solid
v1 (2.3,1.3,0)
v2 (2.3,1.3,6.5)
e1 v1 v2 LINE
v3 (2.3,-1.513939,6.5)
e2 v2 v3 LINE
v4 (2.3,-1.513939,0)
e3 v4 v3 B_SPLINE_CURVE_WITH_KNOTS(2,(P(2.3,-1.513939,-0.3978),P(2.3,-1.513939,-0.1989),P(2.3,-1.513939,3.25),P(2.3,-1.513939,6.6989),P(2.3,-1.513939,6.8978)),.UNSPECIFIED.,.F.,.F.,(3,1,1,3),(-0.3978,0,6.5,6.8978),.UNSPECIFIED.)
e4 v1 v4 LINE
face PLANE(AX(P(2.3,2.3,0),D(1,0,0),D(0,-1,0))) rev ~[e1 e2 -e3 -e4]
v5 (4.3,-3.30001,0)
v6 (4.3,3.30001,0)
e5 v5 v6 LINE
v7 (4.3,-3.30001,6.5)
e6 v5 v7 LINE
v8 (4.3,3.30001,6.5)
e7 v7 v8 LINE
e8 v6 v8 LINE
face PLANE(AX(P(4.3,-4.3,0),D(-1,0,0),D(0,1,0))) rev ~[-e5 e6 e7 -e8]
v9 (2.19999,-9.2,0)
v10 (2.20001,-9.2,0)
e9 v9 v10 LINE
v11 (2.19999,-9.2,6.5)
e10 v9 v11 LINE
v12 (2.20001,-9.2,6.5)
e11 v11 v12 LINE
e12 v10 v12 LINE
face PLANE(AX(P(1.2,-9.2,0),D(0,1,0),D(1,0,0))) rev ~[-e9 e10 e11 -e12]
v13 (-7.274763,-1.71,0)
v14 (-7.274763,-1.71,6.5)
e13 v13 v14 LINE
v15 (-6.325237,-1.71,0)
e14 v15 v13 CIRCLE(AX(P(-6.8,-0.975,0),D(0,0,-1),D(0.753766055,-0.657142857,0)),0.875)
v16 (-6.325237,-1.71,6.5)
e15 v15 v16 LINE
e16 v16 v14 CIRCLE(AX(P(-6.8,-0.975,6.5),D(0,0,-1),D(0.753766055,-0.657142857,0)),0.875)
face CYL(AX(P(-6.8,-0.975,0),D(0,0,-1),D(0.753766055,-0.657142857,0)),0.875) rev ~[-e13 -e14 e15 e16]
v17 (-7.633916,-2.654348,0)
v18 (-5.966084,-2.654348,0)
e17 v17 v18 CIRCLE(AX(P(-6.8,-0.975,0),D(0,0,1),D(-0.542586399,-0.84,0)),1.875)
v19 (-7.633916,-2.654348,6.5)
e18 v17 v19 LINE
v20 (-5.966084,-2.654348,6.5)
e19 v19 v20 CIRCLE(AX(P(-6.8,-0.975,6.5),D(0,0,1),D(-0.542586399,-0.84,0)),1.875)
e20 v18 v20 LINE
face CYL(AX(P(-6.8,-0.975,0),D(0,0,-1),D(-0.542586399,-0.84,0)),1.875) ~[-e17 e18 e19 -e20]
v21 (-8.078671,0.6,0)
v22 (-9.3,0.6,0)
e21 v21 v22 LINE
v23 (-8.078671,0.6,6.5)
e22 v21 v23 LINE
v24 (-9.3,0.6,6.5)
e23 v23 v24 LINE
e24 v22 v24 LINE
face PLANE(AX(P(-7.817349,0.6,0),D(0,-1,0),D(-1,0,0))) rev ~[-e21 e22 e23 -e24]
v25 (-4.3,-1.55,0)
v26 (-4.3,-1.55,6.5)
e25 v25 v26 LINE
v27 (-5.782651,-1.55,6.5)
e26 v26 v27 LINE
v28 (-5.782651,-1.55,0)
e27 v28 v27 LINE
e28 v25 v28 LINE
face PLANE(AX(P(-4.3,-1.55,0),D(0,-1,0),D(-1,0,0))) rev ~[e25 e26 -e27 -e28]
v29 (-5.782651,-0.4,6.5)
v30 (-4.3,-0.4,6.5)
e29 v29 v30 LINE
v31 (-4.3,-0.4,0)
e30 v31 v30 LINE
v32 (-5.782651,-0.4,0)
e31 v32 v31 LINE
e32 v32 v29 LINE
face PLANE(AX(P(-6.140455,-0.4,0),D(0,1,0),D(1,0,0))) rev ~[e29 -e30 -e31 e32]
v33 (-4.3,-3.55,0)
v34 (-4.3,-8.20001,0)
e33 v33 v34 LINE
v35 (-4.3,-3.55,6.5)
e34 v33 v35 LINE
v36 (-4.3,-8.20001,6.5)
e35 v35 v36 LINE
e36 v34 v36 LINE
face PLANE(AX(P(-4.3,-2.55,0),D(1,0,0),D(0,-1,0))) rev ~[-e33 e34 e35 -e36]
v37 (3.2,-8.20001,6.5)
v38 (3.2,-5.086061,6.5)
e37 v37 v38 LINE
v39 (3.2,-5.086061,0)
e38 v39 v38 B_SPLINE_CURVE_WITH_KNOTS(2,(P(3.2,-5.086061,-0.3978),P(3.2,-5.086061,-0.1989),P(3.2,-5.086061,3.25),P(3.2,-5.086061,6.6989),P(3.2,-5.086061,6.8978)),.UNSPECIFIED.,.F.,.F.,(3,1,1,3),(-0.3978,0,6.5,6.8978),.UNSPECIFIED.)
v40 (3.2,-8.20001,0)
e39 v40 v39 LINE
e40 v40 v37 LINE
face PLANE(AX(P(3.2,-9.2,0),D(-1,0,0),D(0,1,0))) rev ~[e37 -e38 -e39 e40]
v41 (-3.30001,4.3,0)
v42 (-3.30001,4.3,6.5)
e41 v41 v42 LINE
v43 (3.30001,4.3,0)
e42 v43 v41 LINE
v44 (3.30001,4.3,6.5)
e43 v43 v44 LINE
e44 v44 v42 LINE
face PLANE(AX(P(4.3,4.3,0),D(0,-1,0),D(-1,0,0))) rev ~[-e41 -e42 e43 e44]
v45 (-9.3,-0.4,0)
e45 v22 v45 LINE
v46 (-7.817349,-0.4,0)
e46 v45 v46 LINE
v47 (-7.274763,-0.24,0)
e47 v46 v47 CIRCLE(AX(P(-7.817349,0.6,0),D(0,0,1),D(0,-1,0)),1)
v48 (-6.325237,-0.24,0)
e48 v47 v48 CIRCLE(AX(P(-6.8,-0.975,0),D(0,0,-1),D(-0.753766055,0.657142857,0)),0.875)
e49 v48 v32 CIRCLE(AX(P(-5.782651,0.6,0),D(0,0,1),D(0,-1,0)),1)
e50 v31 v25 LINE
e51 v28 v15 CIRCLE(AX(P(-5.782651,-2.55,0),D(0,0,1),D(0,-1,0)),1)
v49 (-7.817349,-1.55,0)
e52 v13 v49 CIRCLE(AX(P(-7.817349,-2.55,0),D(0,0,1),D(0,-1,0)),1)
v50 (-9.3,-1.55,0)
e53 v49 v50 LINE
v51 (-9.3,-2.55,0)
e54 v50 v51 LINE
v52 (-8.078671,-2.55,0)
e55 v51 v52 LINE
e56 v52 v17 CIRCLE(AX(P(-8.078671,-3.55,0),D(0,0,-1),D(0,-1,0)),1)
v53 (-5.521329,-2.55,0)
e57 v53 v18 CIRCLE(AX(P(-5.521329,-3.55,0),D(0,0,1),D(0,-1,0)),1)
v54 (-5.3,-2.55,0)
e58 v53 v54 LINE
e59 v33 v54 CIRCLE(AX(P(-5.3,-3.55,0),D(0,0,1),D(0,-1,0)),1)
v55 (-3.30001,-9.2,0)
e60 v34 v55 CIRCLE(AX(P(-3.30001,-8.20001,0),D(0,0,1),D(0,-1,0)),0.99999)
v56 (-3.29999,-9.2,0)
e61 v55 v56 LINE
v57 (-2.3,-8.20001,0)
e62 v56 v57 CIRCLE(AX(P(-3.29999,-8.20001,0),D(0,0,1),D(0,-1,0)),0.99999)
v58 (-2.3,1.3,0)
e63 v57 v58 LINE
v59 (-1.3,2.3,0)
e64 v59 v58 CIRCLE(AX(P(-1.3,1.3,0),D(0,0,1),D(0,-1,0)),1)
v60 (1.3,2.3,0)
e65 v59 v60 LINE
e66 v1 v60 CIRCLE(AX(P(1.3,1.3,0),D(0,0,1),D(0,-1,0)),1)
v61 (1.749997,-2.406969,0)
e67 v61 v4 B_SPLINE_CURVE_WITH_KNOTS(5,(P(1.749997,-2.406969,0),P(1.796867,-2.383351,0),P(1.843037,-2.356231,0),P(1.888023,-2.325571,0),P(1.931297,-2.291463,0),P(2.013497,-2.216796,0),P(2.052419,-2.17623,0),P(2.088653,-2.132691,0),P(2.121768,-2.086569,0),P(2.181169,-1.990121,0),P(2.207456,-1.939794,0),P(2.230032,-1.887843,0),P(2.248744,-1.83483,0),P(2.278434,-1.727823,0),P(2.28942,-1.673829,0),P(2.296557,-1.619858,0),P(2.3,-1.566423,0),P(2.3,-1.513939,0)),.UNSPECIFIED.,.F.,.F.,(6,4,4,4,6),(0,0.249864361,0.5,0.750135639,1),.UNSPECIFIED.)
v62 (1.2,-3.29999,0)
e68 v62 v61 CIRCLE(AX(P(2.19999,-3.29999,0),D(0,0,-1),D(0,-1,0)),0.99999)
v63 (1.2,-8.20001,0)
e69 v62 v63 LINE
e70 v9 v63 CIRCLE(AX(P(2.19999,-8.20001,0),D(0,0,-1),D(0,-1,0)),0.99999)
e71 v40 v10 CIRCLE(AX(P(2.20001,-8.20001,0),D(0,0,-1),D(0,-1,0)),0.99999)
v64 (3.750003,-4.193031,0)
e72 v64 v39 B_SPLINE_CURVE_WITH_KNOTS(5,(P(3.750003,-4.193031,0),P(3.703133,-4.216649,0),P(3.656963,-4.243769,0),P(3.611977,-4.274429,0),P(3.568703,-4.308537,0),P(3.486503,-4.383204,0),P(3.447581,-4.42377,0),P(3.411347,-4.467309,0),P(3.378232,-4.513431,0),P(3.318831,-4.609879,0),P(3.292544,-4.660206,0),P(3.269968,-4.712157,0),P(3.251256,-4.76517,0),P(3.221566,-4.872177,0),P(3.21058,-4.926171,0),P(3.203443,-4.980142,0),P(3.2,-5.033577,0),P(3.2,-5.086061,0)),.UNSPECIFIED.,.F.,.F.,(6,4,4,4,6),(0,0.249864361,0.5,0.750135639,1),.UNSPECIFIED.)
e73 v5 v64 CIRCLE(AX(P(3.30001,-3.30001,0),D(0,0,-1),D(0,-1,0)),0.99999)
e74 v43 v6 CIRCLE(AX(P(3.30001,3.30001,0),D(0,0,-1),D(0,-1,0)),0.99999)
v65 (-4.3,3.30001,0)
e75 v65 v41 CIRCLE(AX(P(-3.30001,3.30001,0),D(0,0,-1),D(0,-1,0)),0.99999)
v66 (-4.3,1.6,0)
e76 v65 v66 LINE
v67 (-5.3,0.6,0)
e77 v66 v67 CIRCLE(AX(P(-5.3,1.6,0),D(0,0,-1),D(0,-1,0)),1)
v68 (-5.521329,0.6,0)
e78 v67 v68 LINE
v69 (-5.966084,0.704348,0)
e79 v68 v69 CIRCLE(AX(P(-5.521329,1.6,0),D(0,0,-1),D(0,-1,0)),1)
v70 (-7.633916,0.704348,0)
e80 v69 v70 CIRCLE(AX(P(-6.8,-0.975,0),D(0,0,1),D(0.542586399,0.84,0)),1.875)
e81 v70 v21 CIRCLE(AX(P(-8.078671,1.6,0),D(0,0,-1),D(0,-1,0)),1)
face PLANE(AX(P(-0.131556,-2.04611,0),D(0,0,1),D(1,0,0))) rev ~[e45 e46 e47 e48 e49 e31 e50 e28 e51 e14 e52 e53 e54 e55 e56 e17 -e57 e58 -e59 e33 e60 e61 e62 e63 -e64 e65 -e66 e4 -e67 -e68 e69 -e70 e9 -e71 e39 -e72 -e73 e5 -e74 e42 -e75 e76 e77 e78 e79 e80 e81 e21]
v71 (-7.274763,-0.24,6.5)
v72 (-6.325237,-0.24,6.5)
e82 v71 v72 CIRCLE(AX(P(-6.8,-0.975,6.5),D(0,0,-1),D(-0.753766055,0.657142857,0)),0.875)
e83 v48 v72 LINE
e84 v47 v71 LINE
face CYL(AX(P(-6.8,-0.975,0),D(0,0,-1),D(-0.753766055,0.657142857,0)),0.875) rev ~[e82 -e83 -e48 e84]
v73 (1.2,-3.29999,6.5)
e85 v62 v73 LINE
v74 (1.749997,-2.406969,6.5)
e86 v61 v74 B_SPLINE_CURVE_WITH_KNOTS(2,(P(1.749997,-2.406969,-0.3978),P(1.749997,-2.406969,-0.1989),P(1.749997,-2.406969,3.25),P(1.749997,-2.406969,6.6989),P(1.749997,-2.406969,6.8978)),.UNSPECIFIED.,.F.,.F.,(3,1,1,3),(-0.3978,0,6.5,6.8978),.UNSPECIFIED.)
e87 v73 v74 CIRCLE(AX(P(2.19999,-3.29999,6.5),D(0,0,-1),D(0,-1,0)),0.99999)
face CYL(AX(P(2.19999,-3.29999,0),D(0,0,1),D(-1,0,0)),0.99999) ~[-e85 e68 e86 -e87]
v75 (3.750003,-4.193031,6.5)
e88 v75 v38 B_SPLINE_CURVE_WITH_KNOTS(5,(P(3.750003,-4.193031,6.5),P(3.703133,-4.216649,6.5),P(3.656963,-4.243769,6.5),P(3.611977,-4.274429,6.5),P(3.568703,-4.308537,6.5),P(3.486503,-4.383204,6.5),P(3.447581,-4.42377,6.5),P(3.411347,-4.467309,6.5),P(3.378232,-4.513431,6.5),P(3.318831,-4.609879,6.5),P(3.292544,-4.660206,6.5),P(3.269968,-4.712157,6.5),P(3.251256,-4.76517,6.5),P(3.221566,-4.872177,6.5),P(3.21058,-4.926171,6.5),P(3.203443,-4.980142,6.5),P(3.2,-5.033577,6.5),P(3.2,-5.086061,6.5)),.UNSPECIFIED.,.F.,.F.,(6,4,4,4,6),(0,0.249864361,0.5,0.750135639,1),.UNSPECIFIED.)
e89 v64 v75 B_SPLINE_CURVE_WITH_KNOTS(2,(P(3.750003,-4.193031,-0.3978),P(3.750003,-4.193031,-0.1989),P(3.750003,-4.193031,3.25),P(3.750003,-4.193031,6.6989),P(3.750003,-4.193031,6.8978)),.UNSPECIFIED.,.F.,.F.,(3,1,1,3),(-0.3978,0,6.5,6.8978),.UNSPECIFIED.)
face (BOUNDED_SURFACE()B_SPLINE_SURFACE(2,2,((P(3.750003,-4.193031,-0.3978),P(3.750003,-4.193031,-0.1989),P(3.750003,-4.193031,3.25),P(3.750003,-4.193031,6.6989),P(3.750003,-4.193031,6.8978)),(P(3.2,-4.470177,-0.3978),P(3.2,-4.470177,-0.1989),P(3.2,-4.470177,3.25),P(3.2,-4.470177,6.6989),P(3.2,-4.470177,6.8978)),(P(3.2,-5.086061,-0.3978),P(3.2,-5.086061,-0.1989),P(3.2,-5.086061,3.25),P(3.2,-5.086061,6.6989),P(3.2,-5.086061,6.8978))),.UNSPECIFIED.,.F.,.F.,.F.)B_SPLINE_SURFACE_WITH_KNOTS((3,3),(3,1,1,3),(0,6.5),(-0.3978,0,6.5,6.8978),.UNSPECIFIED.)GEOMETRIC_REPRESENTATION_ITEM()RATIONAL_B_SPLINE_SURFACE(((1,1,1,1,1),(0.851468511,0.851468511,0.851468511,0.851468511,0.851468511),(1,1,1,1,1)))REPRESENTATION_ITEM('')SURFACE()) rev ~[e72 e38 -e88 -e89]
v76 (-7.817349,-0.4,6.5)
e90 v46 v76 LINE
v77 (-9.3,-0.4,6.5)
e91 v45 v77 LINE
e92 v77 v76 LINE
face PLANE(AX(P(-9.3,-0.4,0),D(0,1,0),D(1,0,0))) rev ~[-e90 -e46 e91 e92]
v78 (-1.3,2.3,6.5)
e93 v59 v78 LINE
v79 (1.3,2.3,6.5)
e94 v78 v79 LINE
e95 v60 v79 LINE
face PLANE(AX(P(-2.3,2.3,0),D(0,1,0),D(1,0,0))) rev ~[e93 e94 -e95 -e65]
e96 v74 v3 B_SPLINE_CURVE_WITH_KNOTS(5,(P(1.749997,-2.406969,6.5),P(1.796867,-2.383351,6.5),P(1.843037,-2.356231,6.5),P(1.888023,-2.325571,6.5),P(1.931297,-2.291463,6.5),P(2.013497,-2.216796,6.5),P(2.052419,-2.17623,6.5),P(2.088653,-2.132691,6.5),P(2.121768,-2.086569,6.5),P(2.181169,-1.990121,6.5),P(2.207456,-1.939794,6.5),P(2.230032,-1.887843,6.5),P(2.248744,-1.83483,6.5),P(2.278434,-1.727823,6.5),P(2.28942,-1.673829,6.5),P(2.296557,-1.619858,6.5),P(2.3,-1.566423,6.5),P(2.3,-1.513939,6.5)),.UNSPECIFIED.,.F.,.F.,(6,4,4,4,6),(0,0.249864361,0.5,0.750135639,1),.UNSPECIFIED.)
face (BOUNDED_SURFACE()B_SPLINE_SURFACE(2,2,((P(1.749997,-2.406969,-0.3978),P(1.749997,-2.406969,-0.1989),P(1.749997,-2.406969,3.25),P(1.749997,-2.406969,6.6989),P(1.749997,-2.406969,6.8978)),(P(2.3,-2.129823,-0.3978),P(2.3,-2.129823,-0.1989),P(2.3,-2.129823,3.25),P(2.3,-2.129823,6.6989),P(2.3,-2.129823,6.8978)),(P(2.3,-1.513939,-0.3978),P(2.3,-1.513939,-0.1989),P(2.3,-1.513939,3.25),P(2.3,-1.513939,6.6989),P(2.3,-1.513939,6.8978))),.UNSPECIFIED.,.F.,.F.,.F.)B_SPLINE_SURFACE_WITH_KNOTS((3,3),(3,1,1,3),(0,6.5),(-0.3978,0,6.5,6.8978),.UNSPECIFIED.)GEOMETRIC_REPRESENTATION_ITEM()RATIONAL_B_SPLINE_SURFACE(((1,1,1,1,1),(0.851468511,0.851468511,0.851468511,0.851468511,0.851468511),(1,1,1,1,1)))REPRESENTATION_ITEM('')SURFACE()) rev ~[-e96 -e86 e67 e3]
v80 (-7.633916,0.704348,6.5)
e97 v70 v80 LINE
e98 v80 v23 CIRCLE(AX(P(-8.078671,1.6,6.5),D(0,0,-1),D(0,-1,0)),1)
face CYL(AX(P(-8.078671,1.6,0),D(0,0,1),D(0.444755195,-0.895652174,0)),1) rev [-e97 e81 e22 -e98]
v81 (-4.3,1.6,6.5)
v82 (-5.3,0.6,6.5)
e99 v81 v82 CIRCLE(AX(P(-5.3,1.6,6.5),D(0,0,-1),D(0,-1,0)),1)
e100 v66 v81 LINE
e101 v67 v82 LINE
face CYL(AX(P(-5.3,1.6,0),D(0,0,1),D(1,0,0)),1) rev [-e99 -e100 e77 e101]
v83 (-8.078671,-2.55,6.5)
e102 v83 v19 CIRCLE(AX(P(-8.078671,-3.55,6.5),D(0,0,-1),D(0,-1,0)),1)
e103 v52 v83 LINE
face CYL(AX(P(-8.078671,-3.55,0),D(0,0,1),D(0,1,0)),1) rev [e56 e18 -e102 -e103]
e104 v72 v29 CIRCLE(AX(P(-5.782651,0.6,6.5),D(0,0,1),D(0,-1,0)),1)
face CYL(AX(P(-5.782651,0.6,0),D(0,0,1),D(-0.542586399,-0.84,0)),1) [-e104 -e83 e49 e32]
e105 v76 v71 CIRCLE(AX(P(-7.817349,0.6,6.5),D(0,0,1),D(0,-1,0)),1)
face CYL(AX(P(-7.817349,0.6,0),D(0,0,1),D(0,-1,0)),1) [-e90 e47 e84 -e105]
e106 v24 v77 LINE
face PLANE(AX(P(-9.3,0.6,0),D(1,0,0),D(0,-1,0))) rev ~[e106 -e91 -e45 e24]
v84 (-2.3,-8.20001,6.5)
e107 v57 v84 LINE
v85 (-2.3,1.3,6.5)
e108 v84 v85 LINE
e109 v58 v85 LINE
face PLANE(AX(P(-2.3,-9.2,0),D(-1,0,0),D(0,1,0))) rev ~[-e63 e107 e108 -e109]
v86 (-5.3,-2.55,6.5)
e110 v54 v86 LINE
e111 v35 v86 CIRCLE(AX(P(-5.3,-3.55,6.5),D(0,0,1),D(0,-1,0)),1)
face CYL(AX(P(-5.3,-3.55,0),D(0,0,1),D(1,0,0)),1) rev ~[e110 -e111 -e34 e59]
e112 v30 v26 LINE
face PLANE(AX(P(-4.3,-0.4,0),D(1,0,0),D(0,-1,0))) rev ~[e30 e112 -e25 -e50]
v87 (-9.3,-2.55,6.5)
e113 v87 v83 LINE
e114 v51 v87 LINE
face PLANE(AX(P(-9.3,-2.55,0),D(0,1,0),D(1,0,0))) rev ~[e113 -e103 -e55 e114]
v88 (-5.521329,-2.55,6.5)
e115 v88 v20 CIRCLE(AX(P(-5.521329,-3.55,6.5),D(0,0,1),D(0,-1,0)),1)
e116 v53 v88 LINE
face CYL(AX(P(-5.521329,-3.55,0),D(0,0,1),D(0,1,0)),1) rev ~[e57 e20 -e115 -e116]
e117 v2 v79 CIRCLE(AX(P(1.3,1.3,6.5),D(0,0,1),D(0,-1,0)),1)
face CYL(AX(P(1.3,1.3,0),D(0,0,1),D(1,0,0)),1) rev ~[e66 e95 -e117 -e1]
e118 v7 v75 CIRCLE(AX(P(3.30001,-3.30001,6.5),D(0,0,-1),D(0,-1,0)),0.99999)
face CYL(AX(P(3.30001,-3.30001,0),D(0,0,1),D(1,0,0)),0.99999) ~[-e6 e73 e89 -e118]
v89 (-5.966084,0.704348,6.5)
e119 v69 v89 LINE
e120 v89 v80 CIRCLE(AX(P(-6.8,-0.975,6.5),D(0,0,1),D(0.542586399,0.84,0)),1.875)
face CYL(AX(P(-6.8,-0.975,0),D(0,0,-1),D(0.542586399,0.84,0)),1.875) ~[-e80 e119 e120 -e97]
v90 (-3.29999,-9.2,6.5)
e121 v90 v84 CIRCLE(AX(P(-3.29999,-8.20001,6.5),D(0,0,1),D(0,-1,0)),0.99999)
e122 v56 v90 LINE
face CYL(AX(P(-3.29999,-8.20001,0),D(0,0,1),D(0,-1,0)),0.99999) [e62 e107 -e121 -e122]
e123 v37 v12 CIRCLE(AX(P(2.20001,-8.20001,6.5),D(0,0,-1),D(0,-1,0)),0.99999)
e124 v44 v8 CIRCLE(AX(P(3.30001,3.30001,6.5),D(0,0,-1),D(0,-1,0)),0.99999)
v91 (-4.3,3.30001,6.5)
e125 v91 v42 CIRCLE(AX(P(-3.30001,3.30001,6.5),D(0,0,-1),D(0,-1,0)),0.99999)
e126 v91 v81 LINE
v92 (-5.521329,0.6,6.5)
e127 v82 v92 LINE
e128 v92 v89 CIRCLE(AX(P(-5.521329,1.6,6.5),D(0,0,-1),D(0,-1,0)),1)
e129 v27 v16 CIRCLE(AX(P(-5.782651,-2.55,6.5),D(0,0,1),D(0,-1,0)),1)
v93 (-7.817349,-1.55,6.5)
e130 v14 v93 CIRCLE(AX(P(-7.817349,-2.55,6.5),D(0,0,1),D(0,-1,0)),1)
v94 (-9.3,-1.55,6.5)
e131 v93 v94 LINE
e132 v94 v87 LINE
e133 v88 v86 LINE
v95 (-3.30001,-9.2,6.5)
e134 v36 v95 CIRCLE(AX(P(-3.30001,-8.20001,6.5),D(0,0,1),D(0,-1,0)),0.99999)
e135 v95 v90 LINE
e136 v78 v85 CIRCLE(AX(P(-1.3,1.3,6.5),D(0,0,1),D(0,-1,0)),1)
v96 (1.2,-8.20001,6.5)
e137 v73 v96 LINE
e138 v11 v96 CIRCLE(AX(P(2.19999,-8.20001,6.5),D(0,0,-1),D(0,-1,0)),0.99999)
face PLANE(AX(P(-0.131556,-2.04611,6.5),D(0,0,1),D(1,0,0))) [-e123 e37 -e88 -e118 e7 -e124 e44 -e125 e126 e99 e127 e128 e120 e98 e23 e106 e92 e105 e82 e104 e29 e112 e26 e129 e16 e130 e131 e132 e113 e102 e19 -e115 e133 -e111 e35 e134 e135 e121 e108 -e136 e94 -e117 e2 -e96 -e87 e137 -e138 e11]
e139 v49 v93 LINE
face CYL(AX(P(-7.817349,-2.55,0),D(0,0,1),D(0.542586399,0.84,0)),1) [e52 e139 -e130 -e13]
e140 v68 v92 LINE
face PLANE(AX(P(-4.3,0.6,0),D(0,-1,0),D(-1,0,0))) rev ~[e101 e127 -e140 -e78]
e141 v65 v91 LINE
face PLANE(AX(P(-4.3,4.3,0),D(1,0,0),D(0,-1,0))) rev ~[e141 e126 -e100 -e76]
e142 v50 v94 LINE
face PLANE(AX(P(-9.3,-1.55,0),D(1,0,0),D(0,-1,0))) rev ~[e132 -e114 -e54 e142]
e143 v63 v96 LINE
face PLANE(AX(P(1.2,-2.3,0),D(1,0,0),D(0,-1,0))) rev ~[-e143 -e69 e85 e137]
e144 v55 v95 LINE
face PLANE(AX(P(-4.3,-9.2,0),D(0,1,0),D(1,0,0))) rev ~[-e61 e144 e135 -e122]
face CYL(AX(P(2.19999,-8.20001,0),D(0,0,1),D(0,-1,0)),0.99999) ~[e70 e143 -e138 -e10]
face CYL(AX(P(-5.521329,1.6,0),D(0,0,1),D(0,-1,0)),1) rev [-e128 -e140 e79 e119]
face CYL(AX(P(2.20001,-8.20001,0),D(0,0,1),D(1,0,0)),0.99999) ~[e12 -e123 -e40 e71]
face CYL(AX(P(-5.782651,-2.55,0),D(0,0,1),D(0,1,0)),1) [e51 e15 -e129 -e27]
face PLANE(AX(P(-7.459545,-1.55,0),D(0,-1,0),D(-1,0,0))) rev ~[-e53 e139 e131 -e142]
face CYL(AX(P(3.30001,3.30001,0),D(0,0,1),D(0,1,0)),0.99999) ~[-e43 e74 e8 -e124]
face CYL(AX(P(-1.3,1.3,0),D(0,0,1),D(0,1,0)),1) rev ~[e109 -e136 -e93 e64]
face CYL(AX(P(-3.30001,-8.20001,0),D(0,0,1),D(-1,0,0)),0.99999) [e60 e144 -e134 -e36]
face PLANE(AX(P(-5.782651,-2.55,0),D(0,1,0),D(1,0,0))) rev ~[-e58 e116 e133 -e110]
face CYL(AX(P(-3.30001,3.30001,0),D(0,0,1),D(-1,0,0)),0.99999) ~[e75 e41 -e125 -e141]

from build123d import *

# Parameters (mm, degrees)
F1_DEPTH = 6.5
F2_R     = 1
F3_R     = 1
F4_R     = 0.99999
F5_R     = 1


# Not quite as in the source:
# - a fillet or chamfer is up to 0.001 mm smaller than in the source, because OpenCascade refuses the exact size


with BuildPart() as f1:
    # F0 (on Top) → F1 (new body)
    with BuildSketch(Plane.XY):
        Polygon((-2.3, 2.3), (2.3, 2.3), (2.3, -2.3), (1.2, -2.3), (1.2, -9.2), (3.2, -9.2), (3.2, -4.3), (4.3, -4.3), (4.3, 4.3), (-4.3, 4.3), (-4.3, 0.6), (-4.3, -0.4), (-4.3, -1.55), (-4.3, -2.3), (-4.3, -2.55), (-4.3, -9.2), (-2.3, -9.2), (-2.3, -2.3), align=None)
        with BuildLine():
            Line((-5.7826505025, -2.55), (-4.3, -2.55))
            Line((-4.3, -2.55), (-4.3, -2.3))
            Line((-4.3, -2.3), (-4.3, -1.55))
            Line((-4.3, -1.55), (-6.1404547021, -1.55))
            ThreePointArc((-6.1404547021, -1.55), (-6.8, -1.85), (-7.4595452979, -1.55))
            Line((-7.4595452979, -1.55), (-9.3, -1.55))
            Line((-9.3, -1.55), (-9.3, -2.55))
            Line((-9.3, -2.55), (-7.8173494975, -2.55))
            Line((-7.8173494975, -2.55), (-5.7826505025, -2.55))
        make_face()
        with BuildLine():
            ThreePointArc((-7.8173494975, -2.55), (-6.8, -2.85), (-5.7826505025, -2.55))
            Line((-5.7826505025, -2.55), (-7.8173494975, -2.55))
        make_face()
        with BuildLine():
            Line((-6.1404547021, -0.4), (-4.3, -0.4))
            Line((-4.3, -0.4), (-4.3, 0.6))
            Line((-4.3, 0.6), (-5.7826505025, 0.6))
            ThreePointArc((-5.7826505025, 0.6), (-6.8, 0.9), (-7.8173494975, 0.6))
            Line((-7.8173494975, 0.6), (-9.3, 0.6))
            Line((-9.3, 0.6), (-9.3, -0.4))
            Line((-9.3, -0.4), (-7.4595452979, -0.4))
            ThreePointArc((-7.4595452979, -0.4), (-6.8, -0.1), (-6.1404547021, -0.4))
        make_face()
    extrude(amount=F1_DEPTH)

    # F2
    f2_edges = [f1.edges().sort_by_distance(p)[0] for p in [
        (-7.817349, -2.55, 3.25),
        (-7.817349, 0.6, 3.25),
        (-5.782651, 0.6, 3.25),
    ]]
    fillet(f2_edges, radius=F2_R)

    # F3
    f3_edges = [f1.edges().sort_by_distance(p)[0] for p in [
        (-6.140455, -1.55, 3.25),
        (-7.459545, -1.55, 3.25),
        (-7.459545, -0.4, 3.25),
        (-6.140455, -0.4, 3.25),
    ]]
    fillet(f3_edges, radius=F3_R)

    # F4 (radius 1 in the source; OpenCascade refuses exactly that, so slightly less here)
    f4_edges = [f1.edges().sort_by_distance(p)[0] for p in [
        (-4.3, -9.2, 3.25),
        (-2.3, -9.2, 3.25),
        (1.2, -9.2, 3.25),
        (3.2, -9.2, 3.25),
        (-4.3, 4.3, 3.25),
        (4.3, -4.3, 3.25),
        (4.3, 4.3, 3.25),
        (1.2, -2.3, 3.25),
    ]]
    fillet(f4_edges, radius=F4_R)

    # F5
    f5_edges = [f1.edges().sort_by_distance(p)[0] for p in [
        (-2.3, 2.3, 3.25),
        (2.3, 2.3, 3.25),
        (2.3, -2.3, 3.25),
        (3.2, -4.3, 3.25),
        (-4.3, 0.6, 3.25),
        (-4.3, -2.55, 3.25),
        (-5.782651, -2.55, 3.25),
    ]]
    fillet(f5_edges, radius=F5_R)


solid = f1.part
